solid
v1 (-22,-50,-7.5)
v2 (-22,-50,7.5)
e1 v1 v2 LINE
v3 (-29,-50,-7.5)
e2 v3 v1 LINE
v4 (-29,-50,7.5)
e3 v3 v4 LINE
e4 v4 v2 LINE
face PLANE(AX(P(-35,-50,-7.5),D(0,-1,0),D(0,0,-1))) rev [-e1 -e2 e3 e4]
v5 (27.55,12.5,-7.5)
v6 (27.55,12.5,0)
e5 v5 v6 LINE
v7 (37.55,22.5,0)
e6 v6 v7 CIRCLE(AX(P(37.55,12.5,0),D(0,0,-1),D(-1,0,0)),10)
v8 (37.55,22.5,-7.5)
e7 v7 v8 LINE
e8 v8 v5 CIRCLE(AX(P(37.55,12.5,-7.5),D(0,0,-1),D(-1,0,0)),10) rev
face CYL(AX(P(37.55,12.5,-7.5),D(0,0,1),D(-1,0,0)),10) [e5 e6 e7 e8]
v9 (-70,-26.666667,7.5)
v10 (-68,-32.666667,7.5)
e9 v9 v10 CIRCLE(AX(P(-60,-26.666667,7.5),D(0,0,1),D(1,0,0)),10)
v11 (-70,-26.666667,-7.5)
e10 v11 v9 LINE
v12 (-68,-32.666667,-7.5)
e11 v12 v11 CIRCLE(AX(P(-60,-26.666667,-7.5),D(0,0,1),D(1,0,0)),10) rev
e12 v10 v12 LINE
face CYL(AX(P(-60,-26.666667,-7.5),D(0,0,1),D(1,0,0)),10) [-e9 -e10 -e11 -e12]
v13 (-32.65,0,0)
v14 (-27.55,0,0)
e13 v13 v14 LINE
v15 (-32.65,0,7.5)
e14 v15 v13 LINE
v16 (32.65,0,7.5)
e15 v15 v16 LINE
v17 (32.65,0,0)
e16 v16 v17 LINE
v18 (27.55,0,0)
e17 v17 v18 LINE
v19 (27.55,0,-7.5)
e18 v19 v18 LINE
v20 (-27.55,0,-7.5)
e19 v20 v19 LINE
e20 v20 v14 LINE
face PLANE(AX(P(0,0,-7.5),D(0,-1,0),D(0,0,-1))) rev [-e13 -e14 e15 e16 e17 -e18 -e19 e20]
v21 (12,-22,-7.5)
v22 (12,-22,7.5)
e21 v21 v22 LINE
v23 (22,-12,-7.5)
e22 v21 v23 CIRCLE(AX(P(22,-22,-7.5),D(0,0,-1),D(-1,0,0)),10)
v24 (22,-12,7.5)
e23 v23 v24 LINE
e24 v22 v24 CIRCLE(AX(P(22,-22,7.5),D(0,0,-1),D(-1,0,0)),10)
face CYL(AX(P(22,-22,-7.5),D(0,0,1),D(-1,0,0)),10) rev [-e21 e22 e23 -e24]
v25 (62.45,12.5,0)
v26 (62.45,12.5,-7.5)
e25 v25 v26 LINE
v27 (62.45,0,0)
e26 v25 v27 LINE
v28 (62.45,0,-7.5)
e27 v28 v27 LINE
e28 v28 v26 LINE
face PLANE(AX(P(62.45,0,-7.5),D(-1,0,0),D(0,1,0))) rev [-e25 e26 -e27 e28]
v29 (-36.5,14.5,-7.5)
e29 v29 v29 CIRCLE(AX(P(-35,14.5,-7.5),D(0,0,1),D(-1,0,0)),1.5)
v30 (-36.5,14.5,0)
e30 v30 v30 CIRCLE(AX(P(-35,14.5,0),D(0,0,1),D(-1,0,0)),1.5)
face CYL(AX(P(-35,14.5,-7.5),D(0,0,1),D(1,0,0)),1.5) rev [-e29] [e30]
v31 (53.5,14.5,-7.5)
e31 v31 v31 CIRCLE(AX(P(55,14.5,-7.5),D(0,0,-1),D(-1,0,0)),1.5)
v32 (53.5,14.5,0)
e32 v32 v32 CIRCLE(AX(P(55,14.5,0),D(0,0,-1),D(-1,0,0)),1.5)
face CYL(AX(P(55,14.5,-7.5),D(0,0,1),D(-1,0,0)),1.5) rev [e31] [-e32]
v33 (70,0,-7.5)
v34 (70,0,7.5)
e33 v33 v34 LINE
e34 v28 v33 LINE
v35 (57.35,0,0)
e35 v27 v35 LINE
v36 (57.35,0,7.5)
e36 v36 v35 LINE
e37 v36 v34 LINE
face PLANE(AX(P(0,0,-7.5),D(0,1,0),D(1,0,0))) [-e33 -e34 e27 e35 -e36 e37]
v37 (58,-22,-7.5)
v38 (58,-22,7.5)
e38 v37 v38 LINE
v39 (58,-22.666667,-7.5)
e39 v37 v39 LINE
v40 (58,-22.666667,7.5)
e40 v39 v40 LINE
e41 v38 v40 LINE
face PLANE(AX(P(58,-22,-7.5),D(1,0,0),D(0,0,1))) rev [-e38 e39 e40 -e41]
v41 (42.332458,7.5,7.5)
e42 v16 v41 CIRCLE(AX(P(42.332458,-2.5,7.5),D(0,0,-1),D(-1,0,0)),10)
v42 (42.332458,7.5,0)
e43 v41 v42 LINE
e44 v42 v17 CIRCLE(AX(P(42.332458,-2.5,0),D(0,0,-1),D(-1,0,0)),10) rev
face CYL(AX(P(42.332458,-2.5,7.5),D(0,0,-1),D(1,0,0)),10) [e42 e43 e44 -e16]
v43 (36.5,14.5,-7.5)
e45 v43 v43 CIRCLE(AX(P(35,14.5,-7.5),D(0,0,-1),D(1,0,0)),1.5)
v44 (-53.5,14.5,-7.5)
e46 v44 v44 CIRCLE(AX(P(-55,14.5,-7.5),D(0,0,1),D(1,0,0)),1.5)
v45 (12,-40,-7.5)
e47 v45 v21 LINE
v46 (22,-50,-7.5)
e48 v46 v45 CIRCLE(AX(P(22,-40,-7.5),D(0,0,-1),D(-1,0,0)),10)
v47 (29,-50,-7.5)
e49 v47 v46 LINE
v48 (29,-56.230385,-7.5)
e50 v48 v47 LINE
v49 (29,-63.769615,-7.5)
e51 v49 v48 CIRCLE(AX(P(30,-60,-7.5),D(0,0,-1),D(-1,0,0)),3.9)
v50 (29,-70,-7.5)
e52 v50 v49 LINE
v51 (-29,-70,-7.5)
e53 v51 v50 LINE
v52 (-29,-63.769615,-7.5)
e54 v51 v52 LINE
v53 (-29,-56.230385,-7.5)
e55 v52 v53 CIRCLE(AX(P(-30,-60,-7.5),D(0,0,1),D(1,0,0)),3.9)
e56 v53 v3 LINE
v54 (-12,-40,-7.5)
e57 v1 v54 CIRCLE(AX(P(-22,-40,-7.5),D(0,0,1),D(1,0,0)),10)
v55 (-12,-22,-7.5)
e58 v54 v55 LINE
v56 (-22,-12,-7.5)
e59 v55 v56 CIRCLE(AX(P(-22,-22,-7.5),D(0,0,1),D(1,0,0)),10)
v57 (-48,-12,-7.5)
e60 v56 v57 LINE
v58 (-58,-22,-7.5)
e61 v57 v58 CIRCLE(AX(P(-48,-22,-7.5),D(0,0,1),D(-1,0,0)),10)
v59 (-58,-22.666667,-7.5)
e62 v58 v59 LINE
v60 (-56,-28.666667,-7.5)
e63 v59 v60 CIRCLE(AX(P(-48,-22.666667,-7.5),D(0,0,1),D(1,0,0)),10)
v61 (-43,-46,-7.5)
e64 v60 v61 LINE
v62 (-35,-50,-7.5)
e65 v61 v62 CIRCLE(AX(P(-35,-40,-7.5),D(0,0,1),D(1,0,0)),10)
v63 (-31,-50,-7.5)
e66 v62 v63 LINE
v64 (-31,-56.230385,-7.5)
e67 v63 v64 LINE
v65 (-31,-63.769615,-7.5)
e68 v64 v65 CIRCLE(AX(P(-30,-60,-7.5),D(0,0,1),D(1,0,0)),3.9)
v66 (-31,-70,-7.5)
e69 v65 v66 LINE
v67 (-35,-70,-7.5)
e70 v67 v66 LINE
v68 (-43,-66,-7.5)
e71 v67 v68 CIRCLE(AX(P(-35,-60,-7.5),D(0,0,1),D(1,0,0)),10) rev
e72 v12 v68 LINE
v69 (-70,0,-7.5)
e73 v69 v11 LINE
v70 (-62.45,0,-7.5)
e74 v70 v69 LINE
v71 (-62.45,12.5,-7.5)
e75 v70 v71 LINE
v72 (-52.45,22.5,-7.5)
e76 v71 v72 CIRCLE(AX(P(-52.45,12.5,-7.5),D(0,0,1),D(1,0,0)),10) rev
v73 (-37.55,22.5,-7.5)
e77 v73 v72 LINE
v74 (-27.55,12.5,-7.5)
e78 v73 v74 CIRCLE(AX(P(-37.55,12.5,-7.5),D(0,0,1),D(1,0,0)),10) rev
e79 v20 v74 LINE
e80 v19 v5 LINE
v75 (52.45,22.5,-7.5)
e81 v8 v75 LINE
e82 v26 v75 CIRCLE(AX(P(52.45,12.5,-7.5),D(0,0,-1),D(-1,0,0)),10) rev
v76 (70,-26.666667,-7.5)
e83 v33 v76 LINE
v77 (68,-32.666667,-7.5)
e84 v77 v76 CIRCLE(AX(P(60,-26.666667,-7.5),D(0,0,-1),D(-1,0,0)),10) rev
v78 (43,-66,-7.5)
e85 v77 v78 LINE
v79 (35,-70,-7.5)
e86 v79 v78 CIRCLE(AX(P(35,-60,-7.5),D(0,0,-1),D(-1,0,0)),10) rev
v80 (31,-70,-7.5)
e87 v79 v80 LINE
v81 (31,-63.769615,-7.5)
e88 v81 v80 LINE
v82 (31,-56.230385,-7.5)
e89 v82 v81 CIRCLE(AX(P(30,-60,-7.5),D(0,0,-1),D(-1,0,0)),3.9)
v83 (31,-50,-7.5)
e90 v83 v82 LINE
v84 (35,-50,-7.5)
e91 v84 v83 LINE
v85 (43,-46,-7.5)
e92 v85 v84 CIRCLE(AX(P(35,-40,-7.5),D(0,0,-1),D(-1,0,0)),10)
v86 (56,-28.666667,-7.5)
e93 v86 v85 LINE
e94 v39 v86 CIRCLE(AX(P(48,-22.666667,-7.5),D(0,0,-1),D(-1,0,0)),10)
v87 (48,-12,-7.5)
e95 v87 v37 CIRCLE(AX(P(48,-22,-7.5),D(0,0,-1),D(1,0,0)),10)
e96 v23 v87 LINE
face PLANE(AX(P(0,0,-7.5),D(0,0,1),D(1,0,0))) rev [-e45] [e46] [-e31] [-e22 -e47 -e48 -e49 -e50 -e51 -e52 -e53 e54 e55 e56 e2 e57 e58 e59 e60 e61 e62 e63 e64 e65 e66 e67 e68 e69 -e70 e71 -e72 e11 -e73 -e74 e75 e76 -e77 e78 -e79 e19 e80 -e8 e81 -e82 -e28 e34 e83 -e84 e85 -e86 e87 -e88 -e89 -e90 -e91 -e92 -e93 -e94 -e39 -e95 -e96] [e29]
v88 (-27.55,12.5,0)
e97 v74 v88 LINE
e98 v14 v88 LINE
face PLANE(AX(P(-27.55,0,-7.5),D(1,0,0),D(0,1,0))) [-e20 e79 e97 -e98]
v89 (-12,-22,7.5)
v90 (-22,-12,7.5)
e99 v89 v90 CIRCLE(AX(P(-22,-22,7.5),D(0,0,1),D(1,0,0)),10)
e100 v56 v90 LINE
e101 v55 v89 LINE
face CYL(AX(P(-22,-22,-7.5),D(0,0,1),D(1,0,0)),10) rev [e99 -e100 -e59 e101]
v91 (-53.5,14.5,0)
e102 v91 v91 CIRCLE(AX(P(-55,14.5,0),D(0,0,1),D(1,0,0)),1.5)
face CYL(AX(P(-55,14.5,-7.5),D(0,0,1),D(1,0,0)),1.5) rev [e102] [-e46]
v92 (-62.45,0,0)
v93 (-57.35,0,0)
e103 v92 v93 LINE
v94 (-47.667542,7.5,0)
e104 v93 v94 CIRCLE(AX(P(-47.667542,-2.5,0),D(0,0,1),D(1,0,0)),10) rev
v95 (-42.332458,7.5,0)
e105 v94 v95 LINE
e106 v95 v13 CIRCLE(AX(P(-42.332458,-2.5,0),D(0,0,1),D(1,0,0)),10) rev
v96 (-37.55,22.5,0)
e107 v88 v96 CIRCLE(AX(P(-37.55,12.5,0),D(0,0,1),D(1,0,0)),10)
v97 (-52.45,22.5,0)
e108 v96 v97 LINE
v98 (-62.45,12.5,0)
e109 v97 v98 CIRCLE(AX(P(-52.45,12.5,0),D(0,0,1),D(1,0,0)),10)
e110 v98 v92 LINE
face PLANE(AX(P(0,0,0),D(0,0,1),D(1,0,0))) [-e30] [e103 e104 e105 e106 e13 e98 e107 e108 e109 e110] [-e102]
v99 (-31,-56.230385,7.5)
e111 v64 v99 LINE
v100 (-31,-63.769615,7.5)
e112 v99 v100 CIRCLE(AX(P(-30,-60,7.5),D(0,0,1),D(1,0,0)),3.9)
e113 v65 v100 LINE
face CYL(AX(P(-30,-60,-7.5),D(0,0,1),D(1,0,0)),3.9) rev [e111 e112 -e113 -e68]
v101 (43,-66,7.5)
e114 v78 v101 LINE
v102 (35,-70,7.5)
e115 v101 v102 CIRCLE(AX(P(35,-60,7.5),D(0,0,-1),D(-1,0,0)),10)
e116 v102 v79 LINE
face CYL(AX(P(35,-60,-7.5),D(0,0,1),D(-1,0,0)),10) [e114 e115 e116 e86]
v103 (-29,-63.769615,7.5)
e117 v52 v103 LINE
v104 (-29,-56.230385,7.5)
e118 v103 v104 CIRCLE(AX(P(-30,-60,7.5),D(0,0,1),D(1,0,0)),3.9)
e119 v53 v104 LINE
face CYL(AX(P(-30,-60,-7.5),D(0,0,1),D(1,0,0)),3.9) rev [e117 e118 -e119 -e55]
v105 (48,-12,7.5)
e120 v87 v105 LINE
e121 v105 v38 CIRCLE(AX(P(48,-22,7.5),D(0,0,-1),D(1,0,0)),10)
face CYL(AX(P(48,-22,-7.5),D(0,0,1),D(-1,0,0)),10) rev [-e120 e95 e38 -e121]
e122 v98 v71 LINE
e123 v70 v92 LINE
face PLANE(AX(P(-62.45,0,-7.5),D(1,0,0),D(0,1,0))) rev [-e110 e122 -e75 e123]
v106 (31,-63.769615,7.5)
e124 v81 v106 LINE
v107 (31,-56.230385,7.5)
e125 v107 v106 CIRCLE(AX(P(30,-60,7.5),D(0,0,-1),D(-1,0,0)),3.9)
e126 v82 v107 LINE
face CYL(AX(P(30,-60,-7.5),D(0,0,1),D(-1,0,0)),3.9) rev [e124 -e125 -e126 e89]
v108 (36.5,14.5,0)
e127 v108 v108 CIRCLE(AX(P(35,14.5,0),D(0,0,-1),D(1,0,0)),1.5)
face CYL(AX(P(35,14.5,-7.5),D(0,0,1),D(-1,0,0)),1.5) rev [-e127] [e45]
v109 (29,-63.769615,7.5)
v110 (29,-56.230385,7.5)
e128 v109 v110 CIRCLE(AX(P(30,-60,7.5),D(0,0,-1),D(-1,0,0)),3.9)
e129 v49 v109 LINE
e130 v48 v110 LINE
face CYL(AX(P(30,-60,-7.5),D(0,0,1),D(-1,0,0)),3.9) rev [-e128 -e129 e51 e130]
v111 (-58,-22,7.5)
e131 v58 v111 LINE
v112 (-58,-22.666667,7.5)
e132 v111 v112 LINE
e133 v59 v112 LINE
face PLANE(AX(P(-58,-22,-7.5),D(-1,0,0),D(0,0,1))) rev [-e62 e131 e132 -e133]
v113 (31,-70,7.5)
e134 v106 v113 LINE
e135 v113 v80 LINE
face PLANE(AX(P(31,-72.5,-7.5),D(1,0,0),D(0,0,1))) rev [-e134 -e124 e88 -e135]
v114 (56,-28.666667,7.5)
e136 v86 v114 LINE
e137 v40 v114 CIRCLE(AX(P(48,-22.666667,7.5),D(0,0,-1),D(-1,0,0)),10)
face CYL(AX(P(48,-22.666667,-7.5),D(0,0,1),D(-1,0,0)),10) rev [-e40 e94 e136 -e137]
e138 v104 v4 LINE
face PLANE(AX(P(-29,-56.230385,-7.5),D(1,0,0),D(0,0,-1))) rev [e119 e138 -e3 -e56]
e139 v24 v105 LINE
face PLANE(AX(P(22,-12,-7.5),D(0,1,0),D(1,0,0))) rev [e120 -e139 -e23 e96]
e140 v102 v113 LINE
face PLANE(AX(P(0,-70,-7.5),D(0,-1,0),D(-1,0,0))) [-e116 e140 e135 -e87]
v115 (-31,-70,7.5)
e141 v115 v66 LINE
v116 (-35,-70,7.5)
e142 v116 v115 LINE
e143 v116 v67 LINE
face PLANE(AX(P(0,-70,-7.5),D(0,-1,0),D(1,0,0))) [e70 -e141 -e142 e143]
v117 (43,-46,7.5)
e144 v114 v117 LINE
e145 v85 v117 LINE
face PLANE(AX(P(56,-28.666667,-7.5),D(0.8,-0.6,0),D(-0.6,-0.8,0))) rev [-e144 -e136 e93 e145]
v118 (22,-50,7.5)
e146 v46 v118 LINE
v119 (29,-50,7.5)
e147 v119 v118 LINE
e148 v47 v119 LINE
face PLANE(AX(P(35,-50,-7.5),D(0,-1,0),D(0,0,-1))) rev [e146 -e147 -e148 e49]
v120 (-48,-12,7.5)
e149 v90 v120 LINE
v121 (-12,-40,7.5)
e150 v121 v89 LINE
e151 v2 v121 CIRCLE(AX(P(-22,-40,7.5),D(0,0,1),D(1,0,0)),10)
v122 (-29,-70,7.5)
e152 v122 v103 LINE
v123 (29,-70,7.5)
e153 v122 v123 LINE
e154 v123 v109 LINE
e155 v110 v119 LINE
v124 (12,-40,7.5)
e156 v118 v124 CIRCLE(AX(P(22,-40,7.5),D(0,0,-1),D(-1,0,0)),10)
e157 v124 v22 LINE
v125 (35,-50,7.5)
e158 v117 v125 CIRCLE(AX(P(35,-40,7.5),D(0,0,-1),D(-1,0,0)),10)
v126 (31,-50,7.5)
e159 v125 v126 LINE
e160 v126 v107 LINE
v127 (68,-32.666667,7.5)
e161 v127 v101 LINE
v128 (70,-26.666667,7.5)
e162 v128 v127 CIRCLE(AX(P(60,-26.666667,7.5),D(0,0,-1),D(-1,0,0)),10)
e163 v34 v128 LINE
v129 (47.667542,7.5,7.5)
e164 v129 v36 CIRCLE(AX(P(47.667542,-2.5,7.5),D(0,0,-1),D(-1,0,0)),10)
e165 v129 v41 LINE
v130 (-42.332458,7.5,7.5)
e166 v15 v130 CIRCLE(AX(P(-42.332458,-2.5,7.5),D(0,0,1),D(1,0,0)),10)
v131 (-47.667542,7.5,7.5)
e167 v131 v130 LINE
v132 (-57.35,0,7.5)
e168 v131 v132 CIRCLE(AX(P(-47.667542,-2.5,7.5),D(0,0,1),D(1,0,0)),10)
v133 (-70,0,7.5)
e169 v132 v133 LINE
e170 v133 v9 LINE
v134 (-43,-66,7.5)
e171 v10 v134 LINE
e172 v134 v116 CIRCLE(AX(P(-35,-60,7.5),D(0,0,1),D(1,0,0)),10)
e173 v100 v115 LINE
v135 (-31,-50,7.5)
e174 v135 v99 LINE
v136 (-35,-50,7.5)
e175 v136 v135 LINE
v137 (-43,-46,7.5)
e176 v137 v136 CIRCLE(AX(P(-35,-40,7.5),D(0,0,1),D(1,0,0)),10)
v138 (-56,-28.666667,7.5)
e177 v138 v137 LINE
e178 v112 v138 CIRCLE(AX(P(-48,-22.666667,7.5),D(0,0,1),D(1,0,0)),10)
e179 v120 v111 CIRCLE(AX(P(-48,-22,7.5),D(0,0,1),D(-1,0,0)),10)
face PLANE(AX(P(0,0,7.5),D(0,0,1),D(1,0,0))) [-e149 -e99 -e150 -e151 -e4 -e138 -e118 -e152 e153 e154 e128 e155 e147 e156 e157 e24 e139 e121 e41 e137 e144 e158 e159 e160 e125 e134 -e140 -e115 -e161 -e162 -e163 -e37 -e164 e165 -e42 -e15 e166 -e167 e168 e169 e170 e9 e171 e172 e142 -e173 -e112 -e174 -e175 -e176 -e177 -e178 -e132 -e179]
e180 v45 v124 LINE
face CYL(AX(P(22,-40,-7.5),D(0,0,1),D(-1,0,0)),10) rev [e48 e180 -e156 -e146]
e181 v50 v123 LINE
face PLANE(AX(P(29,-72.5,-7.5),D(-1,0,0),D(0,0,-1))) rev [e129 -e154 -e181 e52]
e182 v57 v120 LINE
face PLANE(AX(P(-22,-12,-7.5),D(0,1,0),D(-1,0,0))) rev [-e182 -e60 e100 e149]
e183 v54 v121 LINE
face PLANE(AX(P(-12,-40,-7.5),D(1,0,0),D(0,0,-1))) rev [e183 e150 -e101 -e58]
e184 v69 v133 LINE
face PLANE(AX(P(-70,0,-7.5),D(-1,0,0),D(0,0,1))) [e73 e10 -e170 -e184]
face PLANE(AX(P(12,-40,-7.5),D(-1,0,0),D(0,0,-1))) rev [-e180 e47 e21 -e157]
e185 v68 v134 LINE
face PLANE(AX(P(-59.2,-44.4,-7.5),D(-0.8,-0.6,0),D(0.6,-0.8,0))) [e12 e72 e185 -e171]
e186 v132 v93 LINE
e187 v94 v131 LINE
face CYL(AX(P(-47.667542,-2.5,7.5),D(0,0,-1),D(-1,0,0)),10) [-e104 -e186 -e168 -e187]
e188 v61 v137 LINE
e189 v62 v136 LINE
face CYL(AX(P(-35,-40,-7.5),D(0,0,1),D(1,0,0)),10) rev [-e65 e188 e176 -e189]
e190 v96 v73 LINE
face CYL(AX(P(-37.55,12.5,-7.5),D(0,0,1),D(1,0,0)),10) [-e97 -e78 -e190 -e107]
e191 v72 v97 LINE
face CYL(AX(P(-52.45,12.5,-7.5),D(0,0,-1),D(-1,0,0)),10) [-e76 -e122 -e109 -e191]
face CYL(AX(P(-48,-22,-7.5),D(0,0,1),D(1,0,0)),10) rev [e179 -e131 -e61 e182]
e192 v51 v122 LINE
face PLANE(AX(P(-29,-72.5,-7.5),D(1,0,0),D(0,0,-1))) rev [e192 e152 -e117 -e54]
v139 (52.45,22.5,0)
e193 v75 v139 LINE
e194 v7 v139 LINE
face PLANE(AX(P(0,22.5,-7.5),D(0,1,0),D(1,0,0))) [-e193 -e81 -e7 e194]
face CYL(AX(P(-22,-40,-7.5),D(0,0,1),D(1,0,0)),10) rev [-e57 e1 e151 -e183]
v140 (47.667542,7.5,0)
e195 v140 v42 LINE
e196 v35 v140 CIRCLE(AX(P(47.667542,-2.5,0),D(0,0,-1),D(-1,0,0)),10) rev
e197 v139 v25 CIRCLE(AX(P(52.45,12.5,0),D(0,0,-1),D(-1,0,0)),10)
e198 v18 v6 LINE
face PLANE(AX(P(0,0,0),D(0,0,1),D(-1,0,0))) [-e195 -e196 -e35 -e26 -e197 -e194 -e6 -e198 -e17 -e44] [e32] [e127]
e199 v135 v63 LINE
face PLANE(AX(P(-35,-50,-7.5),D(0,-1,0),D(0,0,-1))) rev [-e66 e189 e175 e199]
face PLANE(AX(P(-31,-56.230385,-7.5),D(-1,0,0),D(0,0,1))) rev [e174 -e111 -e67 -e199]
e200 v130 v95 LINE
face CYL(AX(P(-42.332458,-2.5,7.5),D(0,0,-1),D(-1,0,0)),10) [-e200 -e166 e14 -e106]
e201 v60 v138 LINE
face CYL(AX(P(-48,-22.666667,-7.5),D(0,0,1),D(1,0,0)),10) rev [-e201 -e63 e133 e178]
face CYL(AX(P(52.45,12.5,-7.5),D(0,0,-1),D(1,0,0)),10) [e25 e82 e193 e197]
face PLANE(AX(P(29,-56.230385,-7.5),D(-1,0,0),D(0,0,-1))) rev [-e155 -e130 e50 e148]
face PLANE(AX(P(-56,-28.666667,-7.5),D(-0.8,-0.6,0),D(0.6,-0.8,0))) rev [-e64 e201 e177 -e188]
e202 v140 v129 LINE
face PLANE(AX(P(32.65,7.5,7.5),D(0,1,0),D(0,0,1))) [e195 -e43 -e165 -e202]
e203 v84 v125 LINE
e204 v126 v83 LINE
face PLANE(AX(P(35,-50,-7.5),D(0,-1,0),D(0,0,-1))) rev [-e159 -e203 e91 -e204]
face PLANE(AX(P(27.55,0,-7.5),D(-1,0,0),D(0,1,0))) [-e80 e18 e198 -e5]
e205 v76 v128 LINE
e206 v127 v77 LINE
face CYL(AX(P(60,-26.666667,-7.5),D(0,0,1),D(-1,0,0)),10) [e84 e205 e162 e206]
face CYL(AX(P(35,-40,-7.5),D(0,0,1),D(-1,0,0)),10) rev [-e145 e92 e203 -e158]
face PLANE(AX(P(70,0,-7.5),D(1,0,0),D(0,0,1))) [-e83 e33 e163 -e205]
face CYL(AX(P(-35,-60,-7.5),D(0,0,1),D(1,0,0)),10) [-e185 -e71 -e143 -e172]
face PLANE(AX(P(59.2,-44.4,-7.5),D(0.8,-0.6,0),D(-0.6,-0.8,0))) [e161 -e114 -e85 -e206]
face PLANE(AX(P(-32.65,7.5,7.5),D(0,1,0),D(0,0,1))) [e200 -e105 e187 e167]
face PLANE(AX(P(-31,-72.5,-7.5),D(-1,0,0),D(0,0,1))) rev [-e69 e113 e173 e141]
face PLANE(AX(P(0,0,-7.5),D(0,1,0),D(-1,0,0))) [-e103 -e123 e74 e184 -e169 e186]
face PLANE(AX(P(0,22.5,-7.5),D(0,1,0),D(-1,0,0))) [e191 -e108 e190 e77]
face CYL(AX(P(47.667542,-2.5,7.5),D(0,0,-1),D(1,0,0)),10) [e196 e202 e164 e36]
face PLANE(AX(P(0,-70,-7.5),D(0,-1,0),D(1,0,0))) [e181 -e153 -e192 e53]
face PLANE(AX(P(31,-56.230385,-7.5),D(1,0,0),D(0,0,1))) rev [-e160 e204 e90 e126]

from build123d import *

# Parameters (mm, degrees)
BOSS_EXTRU_1_DEPTH           = 7.5
BOSS_EXTRU_1_DEPTH_BACK      = 7.5
ENL_V_MAT_EXTRU_1_DEPTH      = 7.5
CONG_1_R                     = 10
CONG_2_R                     = 10
ENL_V_MAT_EXTRU_3_DEPTH      = 100.278648258
ENL_V_MAT_EXTRU_3_DEPTH_BACK = 100.278648258
ENL_V_MAT_EXTRU_2_DEPTH      = 100.278648258
ENL_V_MAT_EXTRU_2_DEPTH_BACK = 100.278648258
ESQUISSE8_R                  = 1.5
ENL_V_MAT_EXTRU_4_DEPTH      = 100.278648258


with BuildPart() as part:
    # Esquisse1 → Boss.-Extru.1 (new, two sides: drawn at the far end of the back side and taken through both)
    with BuildSketch(Plane.XY.offset(-BOSS_EXTRU_1_DEPTH_BACK)):
        Polygon((-62.45, 0), (-70, 0), (-70, -30), (-40, -70), (0, -70), (0, 0), (-27.55, 0), (-27.55, 22.5), (-62.45, 22.5), align=None)
    extrude(amount=BOSS_EXTRU_1_DEPTH + BOSS_EXTRU_1_DEPTH_BACK)

    # Esquisse3 → Enlèv. mat.-Extru.1 (cut)
    with BuildSketch(Plane.XY):
        Polygon((-32.65, 0), (-32.65, 7.5), (-57.35, 7.5), (-57.35, 0), (-62.45, 0), (-62.45, 22.5), (-27.55, 22.5), (-27.55, 0), align=None)
    extrude(amount=ENL_V_MAT_EXTRU_1_DEPTH, mode=Mode.SUBTRACT)

    # Congé1
    # the kernel refuses this fillet: 10 mm, written as the material it takes off along each edge
    with BuildSketch(Plane(origin=(-62.45, 22.5, 25), x_dir=(1, 0, 0), z_dir=(0, 0, -1))) as cong_1_piece_1:
        with BuildLine():
            CenterArc((CONG_1_R, CONG_1_R), CONG_1_R, 180, 90)
            Line((0, CONG_1_R), (0, 0))
            Line((0, 0), (CONG_1_R, 0))
        make_face()
    extrude(amount=57.5, mode=Mode.SUBTRACT)
    with BuildSketch(Plane(origin=(-57.35, 7.5, 0), x_dir=(1, 0, 0), z_dir=(0, 0, 1))) as cong_1_piece_2:
        with BuildLine():
            CenterArc((9.682458366, -10), CONG_1_R, 90, 75.522487814)
            Line((0, -7.5), (0, 0))
            Line((0, 0), (9.682458366, 0))
        make_face()
    extrude(amount=31.706145914, mode=Mode.SUBTRACT)
    with BuildSketch(Plane(origin=(-32.65, 7.5, 0), x_dir=(0, -1, 0), z_dir=(0, 0, 1))) as cong_1_piece_3:
        with BuildLine():
            CenterArc((10, -9.682458366), CONG_1_R, 104.477512186, 75.522487814)
            Line((0, -9.682458366), (0, 0))
            Line((0, 0), (7.5, 0))
        make_face()
    extrude(amount=31.706145914, mode=Mode.SUBTRACT)
    with BuildSketch(Plane(origin=(-27.55, 22.5, 25), x_dir=(-1, 0, 0), z_dir=(0, 0, -1))) as cong_1_piece_4:
        with BuildLine():
            CenterArc((CONG_1_R, -CONG_1_R), CONG_1_R, 90, 90)
            Line((0, -CONG_1_R), (0, 0))
            Line((0, 0), (CONG_1_R, 0))
        make_face()
    extrude(amount=57.5, mode=Mode.SUBTRACT)

    # Congé2
    cong_2_edges = [part.edges().sort_by_distance(p)[0] for p in [
        (-40, -70, 0),
        (-70, -30, 0),
    ]]
    fillet(cong_2_edges, radius=CONG_2_R)

    # Esquisse6 → Enlèv. mat.-Extru.3 (cut, two sides: drawn at the far end of the back side and taken through both)
    with BuildSketch(Plane.XY.offset(-ENL_V_MAT_EXTRU_3_DEPTH_BACK)):
        with BuildLine():
            Line((-58, -22), (-58, -22.666666667))
            ThreePointArc((-58, -22.666666667), (-57.486832981, -25.828944327), (-56, -28.666666667))
            Line((-56, -28.666666667), (-43, -46))
            ThreePointArc((-43, -46), (-39.472135955, -48.94427191), (-35, -50))
            Line((-35, -50), (-22, -50))
            ThreePointArc((-22, -50), (-14.928932188, -47.071067812), (-12, -40))
            Line((-12, -40), (-12, -22))
            ThreePointArc((-12, -22), (-14.928932188, -14.928932188), (-22, -12))
            Line((-22, -12), (-48, -12))
            ThreePointArc((-48, -12), (-55.071067812, -14.928932188), (-58, -22))
        make_face()
    extrude(amount=ENL_V_MAT_EXTRU_3_DEPTH + ENL_V_MAT_EXTRU_3_DEPTH_BACK, mode=Mode.SUBTRACT)

    # Esquisse5 → Enlèv. mat.-Extru.2 (cut, two sides: drawn at the far end of the back side and taken through both)
    with BuildSketch(Plane.XY.offset(-ENL_V_MAT_EXTRU_2_DEPTH_BACK)):
        with BuildLine():
            Line((-29, -72.5), (-31, -72.5))
            Line((-31, -72.5), (-31, -63.769615365))
            ThreePointArc((-31, -63.769615365), (-33.9, -60), (-31, -56.230384635))
            Line((-31, -56.230384635), (-31, -47.5))
            Line((-31, -47.5), (-29, -47.5))
            Line((-29, -47.5), (-29, -56.230384635))
            ThreePointArc((-29, -56.230384635), (-26.1, -60), (-29, -63.769615365))
            Line((-29, -63.769615365), (-29, -72.5))
        make_face()
    extrude(amount=ENL_V_MAT_EXTRU_2_DEPTH + ENL_V_MAT_EXTRU_2_DEPTH_BACK, mode=Mode.SUBTRACT)

    # Esquisse8 → Enlèv. mat.-Extru.4 (cut, through all)
    with BuildSketch(Plane.XY):
        with Locations((-55, 14.5)):
            Circle(ESQUISSE8_R)
        with Locations(Location((-35, 14.5, 0), (0, 0, 180))):
            Circle(ESQUISSE8_R)
    extrude(amount=-ENL_V_MAT_EXTRU_4_DEPTH, mode=Mode.SUBTRACT)

    # Symétrie1: part across plane


with BuildPart() as part_1:
    add(part.part)
    add(part.part.mirror(Plane(origin=(0, 0, -7.5), x_dir=(0, 0, 1), z_dir=(1, 0, 0))))


solid = part_1.part
